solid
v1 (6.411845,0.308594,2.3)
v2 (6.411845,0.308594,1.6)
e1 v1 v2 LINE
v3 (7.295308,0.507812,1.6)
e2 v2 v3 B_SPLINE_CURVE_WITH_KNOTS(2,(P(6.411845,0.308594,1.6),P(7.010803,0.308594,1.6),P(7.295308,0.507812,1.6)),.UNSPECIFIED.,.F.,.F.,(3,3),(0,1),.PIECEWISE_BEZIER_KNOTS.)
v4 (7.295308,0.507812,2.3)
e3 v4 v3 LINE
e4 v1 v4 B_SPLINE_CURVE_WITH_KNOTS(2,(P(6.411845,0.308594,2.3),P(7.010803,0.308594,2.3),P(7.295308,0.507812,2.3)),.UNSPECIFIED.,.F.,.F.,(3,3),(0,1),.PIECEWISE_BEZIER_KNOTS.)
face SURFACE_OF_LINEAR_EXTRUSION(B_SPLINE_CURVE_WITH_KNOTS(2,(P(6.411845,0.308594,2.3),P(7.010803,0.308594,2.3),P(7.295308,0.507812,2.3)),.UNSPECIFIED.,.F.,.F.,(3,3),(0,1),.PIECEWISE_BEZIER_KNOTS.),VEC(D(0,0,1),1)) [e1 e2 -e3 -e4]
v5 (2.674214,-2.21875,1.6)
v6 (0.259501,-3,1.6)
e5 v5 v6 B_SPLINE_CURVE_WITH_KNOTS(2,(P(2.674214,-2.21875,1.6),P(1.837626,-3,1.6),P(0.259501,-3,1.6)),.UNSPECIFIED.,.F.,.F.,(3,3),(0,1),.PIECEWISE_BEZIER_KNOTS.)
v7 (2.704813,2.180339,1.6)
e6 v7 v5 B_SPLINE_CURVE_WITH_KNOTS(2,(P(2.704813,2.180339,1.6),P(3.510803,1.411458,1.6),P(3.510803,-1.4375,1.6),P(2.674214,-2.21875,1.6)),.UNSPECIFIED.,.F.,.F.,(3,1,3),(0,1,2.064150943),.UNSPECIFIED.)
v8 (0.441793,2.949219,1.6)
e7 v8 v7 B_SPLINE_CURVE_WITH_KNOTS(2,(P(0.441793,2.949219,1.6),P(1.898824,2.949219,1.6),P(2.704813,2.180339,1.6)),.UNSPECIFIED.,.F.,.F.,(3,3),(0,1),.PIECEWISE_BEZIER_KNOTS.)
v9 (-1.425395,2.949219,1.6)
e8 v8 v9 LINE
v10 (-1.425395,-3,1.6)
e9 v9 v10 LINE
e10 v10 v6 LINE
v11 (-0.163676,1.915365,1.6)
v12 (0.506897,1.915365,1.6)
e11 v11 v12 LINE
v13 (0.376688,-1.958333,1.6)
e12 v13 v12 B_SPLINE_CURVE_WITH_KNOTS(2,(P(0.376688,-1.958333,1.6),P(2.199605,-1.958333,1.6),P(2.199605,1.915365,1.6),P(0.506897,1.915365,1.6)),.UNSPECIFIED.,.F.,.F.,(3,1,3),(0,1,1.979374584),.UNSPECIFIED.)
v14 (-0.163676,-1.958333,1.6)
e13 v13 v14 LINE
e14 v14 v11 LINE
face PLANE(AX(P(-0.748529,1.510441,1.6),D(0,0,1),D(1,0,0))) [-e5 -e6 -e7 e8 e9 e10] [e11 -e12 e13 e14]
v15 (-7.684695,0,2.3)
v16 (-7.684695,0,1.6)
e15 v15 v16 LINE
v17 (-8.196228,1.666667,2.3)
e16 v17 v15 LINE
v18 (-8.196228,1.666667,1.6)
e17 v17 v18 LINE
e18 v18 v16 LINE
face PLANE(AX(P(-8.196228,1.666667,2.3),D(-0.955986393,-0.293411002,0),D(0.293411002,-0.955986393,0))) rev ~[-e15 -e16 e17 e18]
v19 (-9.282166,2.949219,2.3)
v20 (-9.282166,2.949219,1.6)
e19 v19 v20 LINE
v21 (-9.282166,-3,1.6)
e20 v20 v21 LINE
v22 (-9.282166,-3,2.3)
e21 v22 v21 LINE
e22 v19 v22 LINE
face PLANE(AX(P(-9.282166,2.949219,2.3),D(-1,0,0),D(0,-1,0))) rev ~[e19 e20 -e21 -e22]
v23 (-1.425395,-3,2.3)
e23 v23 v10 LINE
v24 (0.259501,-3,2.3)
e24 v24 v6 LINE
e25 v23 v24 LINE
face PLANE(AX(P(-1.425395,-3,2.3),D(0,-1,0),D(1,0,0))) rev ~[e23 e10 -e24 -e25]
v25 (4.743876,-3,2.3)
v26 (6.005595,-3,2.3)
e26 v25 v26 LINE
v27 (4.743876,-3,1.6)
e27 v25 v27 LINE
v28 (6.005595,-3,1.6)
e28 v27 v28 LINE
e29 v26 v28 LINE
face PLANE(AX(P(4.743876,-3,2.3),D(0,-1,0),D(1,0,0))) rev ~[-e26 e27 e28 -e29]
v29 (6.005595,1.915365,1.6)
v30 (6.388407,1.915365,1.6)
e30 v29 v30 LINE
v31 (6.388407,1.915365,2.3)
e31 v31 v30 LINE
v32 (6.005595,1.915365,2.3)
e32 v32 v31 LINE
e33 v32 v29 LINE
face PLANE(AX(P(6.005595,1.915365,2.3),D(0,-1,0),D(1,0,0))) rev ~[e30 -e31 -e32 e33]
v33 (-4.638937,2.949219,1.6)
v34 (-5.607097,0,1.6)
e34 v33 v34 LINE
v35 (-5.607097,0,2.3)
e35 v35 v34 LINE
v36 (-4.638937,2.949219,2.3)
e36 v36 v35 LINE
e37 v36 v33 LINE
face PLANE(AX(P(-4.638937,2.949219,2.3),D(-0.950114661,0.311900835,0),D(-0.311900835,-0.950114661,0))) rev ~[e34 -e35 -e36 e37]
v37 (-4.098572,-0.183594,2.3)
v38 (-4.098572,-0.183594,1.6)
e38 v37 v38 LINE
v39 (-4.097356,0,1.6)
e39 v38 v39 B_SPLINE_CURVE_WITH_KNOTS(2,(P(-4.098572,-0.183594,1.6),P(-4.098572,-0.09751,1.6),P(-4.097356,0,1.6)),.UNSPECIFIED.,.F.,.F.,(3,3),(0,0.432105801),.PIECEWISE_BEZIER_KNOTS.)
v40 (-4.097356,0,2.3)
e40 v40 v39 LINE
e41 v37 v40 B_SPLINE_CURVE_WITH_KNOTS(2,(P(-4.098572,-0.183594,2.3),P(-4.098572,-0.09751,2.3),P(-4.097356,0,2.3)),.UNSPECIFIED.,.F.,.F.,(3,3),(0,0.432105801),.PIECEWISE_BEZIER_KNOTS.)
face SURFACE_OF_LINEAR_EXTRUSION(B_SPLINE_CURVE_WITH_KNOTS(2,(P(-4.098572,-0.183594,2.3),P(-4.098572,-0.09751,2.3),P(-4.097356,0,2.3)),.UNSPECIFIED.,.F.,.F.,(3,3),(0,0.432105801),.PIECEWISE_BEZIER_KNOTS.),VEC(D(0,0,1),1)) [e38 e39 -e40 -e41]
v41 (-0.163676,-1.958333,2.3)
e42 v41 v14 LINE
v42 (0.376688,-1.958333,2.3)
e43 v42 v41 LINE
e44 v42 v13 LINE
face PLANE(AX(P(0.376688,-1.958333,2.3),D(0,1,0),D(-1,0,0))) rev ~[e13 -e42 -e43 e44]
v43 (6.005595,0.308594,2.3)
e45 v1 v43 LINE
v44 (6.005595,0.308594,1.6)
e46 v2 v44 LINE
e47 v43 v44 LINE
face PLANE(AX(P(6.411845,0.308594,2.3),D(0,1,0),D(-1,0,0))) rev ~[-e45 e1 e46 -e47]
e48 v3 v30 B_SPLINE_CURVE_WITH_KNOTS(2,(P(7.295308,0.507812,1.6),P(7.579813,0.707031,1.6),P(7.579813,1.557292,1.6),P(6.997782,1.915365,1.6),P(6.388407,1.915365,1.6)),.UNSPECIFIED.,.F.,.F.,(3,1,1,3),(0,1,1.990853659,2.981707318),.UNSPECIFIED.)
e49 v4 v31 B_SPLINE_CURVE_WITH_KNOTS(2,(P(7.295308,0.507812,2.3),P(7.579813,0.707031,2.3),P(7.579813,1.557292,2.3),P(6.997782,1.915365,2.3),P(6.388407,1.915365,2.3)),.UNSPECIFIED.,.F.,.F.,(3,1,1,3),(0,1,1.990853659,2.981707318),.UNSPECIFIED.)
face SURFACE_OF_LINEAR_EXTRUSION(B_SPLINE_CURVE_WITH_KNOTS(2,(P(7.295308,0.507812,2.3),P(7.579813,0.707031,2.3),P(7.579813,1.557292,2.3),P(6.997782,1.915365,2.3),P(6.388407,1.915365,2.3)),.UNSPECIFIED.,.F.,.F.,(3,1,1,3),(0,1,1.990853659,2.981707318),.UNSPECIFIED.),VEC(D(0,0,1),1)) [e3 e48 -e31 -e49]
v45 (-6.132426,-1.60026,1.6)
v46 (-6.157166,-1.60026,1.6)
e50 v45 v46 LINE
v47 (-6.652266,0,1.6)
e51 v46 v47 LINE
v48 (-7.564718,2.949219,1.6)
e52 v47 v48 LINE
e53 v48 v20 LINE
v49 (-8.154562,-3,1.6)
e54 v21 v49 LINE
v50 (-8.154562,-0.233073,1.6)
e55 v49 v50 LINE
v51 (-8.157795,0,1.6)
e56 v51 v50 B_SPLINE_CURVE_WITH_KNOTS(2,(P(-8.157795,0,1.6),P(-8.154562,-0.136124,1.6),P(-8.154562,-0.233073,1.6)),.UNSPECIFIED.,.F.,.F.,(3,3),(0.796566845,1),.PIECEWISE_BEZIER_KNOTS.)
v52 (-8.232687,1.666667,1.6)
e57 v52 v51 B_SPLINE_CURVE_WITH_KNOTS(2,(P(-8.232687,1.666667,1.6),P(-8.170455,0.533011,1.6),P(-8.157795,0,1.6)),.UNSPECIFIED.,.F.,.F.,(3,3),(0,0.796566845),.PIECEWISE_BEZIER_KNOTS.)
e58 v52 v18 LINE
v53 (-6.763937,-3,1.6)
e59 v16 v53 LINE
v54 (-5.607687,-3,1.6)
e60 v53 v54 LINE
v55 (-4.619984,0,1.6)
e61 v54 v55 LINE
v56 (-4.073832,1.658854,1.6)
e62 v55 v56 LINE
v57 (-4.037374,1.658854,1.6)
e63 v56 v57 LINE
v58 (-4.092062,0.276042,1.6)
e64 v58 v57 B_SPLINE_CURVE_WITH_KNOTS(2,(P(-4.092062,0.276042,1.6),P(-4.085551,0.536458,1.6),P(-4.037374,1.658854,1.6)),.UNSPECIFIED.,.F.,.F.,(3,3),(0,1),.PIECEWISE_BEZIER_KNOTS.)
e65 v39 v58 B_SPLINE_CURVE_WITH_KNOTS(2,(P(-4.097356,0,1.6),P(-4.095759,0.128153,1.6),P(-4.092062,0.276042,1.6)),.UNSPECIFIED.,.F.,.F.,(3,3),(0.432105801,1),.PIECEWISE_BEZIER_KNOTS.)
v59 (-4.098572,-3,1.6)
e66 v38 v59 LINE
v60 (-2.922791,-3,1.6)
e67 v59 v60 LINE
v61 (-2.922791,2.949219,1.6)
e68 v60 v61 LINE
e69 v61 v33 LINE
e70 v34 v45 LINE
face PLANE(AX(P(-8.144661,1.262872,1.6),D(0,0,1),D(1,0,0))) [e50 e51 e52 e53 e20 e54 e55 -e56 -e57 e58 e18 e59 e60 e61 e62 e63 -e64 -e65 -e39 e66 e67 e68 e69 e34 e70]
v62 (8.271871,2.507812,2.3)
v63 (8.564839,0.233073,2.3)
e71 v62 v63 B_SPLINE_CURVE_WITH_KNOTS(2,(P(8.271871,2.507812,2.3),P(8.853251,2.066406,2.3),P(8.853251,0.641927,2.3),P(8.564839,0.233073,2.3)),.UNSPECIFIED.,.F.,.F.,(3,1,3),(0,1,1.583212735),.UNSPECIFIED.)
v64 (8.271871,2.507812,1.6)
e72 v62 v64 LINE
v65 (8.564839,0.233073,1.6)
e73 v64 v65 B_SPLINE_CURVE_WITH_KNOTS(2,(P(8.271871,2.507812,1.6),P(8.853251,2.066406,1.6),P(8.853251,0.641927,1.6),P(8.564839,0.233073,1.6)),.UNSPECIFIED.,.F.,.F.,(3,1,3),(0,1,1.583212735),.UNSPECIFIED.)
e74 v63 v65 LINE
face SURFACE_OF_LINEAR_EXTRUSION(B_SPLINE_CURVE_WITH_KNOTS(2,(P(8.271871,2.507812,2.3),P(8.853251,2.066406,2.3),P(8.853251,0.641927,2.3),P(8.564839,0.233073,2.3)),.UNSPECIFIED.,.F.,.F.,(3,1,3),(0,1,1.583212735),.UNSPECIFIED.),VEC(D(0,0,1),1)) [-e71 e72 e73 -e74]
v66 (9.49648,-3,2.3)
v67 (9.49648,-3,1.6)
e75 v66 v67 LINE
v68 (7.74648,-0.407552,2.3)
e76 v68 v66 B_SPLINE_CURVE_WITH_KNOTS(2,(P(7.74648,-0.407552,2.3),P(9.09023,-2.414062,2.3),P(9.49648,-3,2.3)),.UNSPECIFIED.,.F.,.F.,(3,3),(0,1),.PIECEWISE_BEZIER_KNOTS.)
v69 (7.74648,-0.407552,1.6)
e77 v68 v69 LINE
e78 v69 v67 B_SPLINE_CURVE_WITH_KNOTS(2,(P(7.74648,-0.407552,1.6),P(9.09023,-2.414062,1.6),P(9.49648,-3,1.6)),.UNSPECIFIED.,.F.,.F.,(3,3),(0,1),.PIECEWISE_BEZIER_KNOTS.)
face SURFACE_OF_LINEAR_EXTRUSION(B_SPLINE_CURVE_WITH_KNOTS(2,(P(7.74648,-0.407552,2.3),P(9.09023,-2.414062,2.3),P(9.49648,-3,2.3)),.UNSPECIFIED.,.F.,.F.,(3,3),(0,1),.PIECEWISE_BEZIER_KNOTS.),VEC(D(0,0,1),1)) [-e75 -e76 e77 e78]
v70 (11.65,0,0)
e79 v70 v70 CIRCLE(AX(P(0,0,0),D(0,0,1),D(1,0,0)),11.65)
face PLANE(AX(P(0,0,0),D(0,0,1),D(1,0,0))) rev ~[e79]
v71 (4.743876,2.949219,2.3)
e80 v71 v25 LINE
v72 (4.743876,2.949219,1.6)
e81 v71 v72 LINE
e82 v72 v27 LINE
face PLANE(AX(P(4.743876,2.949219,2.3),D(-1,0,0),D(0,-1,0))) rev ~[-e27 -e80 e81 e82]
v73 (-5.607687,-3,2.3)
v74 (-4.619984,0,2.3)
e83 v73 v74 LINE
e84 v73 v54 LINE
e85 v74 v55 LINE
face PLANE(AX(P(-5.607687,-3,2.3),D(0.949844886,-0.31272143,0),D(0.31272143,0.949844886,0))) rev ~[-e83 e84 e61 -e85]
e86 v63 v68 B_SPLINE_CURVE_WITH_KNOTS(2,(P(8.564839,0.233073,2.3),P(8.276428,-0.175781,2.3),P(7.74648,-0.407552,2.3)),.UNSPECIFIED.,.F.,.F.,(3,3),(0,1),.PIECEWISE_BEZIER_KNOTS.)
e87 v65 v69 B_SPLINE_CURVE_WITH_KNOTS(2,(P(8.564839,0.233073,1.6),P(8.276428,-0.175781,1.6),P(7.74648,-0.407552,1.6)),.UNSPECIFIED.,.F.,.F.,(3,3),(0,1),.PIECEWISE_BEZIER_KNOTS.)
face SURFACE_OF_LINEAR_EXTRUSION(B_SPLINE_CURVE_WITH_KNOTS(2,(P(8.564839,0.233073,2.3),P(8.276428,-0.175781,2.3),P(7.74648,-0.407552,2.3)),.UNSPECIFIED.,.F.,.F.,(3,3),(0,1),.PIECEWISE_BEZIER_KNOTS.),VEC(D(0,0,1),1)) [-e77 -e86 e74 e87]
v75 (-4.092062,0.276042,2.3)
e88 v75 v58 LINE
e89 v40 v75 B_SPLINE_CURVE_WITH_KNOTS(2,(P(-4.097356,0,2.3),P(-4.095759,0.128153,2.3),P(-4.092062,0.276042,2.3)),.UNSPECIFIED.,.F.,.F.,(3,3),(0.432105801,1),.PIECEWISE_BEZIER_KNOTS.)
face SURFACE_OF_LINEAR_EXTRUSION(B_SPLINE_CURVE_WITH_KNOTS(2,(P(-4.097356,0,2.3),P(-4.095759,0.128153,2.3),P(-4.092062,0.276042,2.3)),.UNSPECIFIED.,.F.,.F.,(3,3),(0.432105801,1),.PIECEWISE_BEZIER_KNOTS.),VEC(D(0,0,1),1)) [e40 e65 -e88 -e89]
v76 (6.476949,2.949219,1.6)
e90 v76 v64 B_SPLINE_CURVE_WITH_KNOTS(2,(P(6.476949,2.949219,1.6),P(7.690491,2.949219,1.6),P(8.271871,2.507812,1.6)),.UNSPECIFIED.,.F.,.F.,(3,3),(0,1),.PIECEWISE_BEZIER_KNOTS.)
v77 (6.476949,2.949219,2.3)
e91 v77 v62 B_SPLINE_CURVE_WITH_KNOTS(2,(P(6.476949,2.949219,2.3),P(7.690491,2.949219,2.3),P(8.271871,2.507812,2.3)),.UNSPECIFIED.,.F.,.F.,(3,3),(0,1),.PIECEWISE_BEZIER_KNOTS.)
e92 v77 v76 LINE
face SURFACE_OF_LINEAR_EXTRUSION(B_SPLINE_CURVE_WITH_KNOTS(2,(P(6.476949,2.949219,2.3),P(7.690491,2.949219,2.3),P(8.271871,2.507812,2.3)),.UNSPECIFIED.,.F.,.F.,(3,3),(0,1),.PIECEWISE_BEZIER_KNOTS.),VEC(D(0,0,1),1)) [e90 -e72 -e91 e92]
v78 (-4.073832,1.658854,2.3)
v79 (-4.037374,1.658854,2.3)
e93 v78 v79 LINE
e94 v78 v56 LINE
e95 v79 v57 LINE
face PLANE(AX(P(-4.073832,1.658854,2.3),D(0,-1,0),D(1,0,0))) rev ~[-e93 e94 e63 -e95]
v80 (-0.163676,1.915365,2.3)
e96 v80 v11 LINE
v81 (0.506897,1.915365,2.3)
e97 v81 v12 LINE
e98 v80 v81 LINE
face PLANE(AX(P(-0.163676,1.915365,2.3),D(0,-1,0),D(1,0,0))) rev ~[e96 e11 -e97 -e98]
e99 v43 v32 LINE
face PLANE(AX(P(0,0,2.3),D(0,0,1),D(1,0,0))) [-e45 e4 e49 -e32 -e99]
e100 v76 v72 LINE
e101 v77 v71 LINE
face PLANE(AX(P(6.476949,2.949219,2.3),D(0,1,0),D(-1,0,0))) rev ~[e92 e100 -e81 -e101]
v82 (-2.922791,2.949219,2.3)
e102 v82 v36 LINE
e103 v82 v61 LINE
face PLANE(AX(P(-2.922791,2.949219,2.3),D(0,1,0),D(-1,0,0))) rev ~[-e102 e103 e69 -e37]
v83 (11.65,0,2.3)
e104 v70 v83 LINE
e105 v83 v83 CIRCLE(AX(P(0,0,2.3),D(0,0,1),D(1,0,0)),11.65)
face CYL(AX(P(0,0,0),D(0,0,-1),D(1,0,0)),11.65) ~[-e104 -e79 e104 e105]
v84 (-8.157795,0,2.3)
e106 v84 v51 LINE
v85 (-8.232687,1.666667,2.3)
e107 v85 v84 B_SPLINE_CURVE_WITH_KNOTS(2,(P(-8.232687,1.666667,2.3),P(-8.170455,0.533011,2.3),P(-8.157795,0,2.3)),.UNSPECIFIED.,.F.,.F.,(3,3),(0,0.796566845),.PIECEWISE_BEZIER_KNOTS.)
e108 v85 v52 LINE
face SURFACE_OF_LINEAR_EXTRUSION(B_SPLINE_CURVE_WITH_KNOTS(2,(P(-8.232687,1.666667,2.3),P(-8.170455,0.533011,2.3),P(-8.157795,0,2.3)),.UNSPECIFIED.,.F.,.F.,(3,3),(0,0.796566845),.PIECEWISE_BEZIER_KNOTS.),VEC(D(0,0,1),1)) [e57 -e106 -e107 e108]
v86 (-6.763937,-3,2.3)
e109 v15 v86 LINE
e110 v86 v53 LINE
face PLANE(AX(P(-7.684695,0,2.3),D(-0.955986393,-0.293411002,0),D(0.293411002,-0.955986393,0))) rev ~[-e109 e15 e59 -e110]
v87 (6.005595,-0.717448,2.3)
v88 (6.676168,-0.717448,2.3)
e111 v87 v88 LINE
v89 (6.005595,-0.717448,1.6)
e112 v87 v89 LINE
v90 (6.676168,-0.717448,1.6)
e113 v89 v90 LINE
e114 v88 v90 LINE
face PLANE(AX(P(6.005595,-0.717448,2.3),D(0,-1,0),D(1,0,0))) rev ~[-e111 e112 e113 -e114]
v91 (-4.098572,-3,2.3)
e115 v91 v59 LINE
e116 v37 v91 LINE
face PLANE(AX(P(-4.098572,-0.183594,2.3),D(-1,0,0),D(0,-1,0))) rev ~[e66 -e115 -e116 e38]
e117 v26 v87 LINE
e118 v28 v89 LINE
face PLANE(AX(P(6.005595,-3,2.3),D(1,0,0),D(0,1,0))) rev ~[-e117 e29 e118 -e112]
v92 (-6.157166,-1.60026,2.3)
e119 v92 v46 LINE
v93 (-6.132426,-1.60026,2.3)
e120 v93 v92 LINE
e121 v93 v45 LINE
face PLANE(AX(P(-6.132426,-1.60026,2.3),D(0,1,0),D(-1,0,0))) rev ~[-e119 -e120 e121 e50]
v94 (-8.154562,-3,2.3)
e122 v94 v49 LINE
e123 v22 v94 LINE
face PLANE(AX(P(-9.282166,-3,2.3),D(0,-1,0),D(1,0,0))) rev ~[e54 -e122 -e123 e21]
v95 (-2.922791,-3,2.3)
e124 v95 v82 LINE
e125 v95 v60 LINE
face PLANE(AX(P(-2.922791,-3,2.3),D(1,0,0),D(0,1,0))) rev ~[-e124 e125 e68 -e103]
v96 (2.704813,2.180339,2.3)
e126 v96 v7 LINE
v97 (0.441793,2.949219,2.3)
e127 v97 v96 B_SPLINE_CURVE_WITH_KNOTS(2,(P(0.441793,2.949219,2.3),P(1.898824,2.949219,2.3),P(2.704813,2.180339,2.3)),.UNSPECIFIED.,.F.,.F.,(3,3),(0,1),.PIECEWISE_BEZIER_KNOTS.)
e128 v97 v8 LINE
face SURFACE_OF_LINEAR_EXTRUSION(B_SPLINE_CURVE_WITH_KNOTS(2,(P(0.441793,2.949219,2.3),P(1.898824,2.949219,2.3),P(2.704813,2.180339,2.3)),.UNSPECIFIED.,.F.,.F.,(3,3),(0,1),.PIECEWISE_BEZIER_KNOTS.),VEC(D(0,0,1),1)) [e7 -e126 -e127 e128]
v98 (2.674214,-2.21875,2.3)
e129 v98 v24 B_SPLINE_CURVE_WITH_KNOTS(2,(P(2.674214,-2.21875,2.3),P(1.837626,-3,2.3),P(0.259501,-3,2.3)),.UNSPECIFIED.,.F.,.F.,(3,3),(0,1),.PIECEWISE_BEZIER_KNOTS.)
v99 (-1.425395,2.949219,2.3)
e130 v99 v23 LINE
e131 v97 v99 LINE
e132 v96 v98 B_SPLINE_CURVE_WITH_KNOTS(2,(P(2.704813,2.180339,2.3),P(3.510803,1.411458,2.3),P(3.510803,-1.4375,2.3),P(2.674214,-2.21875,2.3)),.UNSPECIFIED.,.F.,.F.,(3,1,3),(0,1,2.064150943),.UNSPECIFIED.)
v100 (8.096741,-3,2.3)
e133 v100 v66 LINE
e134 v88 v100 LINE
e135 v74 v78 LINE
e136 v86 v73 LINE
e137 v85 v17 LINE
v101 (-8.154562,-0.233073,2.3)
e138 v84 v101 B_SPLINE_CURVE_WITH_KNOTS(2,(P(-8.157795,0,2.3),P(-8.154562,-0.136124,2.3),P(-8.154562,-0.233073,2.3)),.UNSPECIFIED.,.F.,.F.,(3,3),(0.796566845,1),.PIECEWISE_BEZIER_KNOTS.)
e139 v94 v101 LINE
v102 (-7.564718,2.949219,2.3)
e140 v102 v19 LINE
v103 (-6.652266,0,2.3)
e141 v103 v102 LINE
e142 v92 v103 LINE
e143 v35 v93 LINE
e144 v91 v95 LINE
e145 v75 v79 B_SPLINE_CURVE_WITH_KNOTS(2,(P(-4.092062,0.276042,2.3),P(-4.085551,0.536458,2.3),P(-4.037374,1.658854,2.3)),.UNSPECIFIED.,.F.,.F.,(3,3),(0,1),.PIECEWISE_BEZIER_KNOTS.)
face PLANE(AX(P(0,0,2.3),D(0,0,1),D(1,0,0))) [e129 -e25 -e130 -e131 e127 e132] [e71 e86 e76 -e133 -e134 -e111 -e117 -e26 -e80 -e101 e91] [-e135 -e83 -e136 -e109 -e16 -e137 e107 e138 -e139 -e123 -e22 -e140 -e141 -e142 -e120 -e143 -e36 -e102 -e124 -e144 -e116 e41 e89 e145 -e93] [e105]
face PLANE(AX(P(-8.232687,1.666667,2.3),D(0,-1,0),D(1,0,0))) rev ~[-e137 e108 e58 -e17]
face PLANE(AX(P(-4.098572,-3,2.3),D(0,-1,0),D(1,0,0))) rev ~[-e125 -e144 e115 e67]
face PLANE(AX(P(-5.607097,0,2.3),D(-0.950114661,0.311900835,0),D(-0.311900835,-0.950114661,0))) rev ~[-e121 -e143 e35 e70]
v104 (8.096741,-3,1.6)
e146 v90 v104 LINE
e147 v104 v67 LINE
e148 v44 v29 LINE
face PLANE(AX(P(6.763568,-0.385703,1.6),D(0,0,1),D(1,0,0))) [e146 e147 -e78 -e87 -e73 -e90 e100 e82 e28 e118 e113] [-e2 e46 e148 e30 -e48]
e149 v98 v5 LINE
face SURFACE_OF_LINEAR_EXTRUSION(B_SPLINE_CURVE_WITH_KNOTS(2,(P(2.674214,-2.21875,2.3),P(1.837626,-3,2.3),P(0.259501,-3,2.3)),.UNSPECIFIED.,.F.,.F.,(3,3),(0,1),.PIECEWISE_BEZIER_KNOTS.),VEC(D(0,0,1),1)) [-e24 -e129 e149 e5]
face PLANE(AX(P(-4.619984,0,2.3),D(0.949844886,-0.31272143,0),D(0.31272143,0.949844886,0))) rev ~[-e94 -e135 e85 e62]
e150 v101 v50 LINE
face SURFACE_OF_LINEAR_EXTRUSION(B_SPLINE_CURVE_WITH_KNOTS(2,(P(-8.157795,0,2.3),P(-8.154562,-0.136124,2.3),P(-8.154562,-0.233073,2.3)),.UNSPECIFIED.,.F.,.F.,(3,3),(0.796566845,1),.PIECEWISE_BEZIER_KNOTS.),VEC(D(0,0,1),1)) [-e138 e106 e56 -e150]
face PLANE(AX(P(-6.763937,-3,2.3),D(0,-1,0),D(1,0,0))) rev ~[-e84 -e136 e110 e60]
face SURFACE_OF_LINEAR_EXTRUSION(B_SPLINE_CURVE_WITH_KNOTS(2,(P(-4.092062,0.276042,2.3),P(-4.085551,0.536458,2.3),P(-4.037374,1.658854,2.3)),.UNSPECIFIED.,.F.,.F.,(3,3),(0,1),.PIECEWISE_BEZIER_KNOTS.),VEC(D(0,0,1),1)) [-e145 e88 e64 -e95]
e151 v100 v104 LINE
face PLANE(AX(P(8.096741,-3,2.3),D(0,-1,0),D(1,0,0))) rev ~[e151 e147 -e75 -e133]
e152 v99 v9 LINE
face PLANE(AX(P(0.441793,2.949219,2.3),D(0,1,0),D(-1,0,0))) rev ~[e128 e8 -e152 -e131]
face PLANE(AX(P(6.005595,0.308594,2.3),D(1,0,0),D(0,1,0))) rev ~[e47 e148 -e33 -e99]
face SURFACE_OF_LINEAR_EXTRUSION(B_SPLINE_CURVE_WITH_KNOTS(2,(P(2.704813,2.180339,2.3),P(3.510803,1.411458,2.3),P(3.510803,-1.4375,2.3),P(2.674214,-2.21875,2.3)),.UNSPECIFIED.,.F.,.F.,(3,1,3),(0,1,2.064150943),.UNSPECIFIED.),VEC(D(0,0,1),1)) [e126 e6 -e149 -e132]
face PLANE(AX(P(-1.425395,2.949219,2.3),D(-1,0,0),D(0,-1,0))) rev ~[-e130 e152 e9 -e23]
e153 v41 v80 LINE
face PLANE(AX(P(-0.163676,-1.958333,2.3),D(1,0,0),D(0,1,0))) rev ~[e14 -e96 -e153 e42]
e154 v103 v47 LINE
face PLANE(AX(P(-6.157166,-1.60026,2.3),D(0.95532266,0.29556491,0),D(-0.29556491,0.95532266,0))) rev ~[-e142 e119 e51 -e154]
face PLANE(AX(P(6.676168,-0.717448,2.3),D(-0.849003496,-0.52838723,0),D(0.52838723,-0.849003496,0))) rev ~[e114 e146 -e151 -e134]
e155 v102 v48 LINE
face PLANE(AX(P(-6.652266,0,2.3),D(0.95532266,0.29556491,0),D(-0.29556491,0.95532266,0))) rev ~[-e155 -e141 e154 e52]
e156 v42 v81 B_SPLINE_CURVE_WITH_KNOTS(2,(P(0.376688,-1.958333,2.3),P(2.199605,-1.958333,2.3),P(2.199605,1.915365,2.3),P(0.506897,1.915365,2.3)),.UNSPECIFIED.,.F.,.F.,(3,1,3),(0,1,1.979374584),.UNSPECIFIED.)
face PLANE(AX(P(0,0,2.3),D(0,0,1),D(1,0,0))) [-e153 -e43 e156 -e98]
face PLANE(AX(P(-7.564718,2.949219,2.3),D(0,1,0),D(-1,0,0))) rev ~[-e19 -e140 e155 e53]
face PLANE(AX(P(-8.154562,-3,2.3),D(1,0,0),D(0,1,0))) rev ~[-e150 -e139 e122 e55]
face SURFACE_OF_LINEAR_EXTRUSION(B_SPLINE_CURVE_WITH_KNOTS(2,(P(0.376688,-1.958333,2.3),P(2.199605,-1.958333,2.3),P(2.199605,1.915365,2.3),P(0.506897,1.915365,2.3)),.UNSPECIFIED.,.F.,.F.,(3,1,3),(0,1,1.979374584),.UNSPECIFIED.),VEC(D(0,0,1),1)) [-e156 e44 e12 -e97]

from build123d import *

# Parameters (mm, degrees)
F0_R     = 11.65
F1_DEPTH = 2.3
F3_DEPTH = 0.7


with BuildPart() as f1:
    # F0 (on Top) → F1 (new body)
    with BuildSketch(Plane.XY):
        Circle(F0_R)
    extrude(amount=F1_DEPTH)

    # F2 (on face) → F3 (cut)
    with BuildSketch(Plane.XY.offset(2.3)):
        with BuildLine():
            Line((-9.2821657193, 2.94921875), (-9.2821657193, 0))
            Line((-9.2821657193, 0), (-8.1577947596, 0))
            add(Edge.make_bspline(
                [(-8.2326865526, 1.6666666667), (-8.1704547679, 0.5330109879), (-8.1577947596, 0)],
                knots=[0, 0, 0, 0.7965668448, 0.7965668448, 0.7965668448], degree=2))
            Line((-8.2326865526, 1.6666666667), (-8.1962282193, 1.6666666667))
            Line((-8.1962282193, 1.6666666667), (-7.6846954812, 0))
            Line((-7.6846954812, 0), (-6.6522663233, 0))
            Line((-6.6522663233, 0), (-7.5647178026, 2.94921875))
            Line((-7.5647178026, 2.94921875), (-9.2821657193, 2.94921875))
        make_face()
        with BuildLine():
            Line((-8.1577947596, 0), (-9.2821657193, 0))
            Line((-9.2821657193, 0), (-9.2821657193, -3))
            Line((-9.2821657193, -3), (-8.1545615526, -3))
            Line((-8.1545615526, -3), (-8.1545615526, -0.2330729167))
            add(Edge.make_bspline(
                [(-8.1577947596, 0), (-8.1545615526, -0.1361243036), (-8.1545615526, -0.2330729167)],
                knots=[0.7965668448, 0.7965668448, 0.7965668448, 1, 1, 1], degree=2))
        make_face()
        Polygon((-5.6076865526, -3), (-4.6199839255, 0), (-5.607097373, 0), (-6.132426136, -1.6002604167), (-6.1571657193, -1.6002604167), (-6.6522663233, 0), (-7.6846954812, 0), (-6.7639365526, -3), align=None)
        with BuildLine():
            Line((-4.0973563741, 0), (-2.9227907193, 0))
            Line((-2.9227907193, 0), (-2.9227907193, 2.94921875))
            Line((-2.9227907193, 2.94921875), (-4.6389365526, 2.94921875))
            Line((-4.6389365526, 2.94921875), (-5.607097373, 0))
            Line((-5.607097373, 0), (-4.6199839255, 0))
            Line((-4.6199839255, 0), (-4.073832386, 1.6588541667))
            Line((-4.073832386, 1.6588541667), (-4.0373740526, 1.6588541667))
            add(Edge.make_bspline(
                [(-4.0920615526, 0.2760416667), (-4.085551136, 0.5364583333), (-4.0373740526, 1.6588541667)],
                knots=[0, 0, 0, 1, 1, 1], degree=2))
            add(Edge.make_bspline(
                [(-4.0973563741, 0), (-4.0957587805, 0.1281525523), (-4.0920615526, 0.2760416667)],
                knots=[0.432105801, 0.432105801, 0.432105801, 1, 1, 1], degree=2))
        make_face()
        with BuildLine():
            Line((-2.9227907193, -3), (-2.9227907193, 0))
            Line((-2.9227907193, 0), (-4.0973563741, 0))
            add(Edge.make_bspline(
                [(-4.0985719693, -0.18359375), (-4.0985719693, -0.0975101725), (-4.0973563741, 0)],
                knots=[0, 0, 0, 0.432105801, 0.432105801, 0.432105801], degree=2))
            Line((-4.0985719693, -0.18359375), (-4.0985719693, -3))
            Line((-4.0985719693, -3), (-2.9227907193, -3))
        make_face()
        Polygon((-1.425394886, 0), (-0.163676136, 0), (-0.163676136, 1.9153645833), (0, 1.9153645833), (0, 2.94921875), (-1.425394886, 2.94921875), align=None)
        with BuildLine():
            Line((-0.163676136, -1.9583333333), (-0.163676136, 0))
            Line((-0.163676136, 0), (-1.425394886, 0))
            Line((-1.425394886, 0), (-1.425394886, -3))
            Line((-1.425394886, -3), (0.2595009474, -3))
            add(Edge.make_bspline(
                [(2.674214489, -2.21875), (1.8376259474, -3), (0.2595009474, -3)],
                knots=[0, 0, 0, 1, 1, 1], degree=2))
            add(Edge.make_bspline(
                [(3.5108030307, 0.03125), (3.5108030307, -1.4375), (2.674214489, -2.21875)],
                knots=[0, 0, 0, 1, 1, 1], degree=2))
            add(Edge.make_bspline(
                [(2.7048134474, 2.1803385417), (3.5108030307, 1.4114583333), (3.5108030307, 0.03125)],
                knots=[0, 0, 0, 1, 1, 1], degree=2))
            add(Edge.make_bspline(
                [(0.441792614, 2.94921875), (1.898823864, 2.94921875), (2.7048134474, 2.1803385417)],
                knots=[0, 0, 0, 1, 1, 1], degree=2))
            Line((0.441792614, 2.94921875), (0, 2.94921875))
            Line((0, 2.94921875), (0, 1.9153645833))
            Line((0, 1.9153645833), (0.5068967807, 1.9153645833))
            add(Edge.make_bspline(
                [(2.199605114, -0.0013020833), (2.199605114, 1.9153645833), (0.5068967807, 1.9153645833)],
                knots=[0, 0, 0, 1, 1, 1], degree=2))
            add(Edge.make_bspline(
                [(0.3766884474, -1.9583333333), (2.199605114, -1.9583333333), (2.199605114, -0.0013020833)],
                knots=[0, 0, 0, 1, 1, 1], degree=2))
            Line((0.3766884474, -1.9583333333), (-0.163676136, -1.9583333333))
        make_face()
        with BuildLine():
            Line((6.0055946974, -3), (6.0055946974, -0.7174479167))
            Line((6.0055946974, -0.7174479167), (6.676167614, -0.7174479167))
            Line((6.676167614, -0.7174479167), (8.0967405307, -3))
            Line((8.0967405307, -3), (9.496480114, -3))
            add(Edge.make_bspline(
                [(7.746480114, -0.4075520833), (9.090230114, -2.4140625), (9.496480114, -3)],
                knots=[0, 0, 0, 1, 1, 1], degree=2))
            add(Edge.make_bspline(
                [(8.564839489, 0.2330729167), (8.2764280307, -0.17578125), (7.746480114, -0.4075520833)],
                knots=[0, 0, 0, 1, 1, 1], degree=2))
            add(Edge.make_bspline(
                [(8.8532509474, 1.1666666667), (8.8532509474, 0.6419270833), (8.564839489, 0.2330729167)],
                knots=[0, 0, 0, 1, 1, 1], degree=2))
            add(Edge.make_bspline(
                [(8.271870739, 2.5078125), (8.8532509474, 2.06640625), (8.8532509474, 1.1666666667)],
                knots=[0, 0, 0, 1, 1, 1], degree=2))
            add(Edge.make_bspline(
                [(6.476948864, 2.94921875), (7.6904905307, 2.94921875), (8.271870739, 2.5078125)],
                knots=[0, 0, 0, 1, 1, 1], degree=2))
            Line((6.476948864, 2.94921875), (4.7438759474, 2.94921875))
            Line((4.7438759474, 2.94921875), (4.7438759474, -3))
            Line((4.7438759474, -3), (6.0055946974, -3))
        make_face()
        with BuildLine():
            Line((6.4118446974, 0.30859375), (6.0055946974, 0.30859375))
            Line((6.0055946974, 0.30859375), (6.0055946974, 1.9153645833))
            Line((6.0055946974, 1.9153645833), (6.3884071974, 1.9153645833))
            add(Edge.make_bspline(
                [(7.2887978224, 1.736328125), (6.9977821974, 1.9153645833), (6.3884071974, 1.9153645833)],
                knots=[0, 0, 0, 1, 1, 1], degree=2))
            add(Edge.make_bspline(
                [(7.5798134474, 1.1341145833), (7.5798134474, 1.5572916667), (7.2887978224, 1.736328125)],
                knots=[0, 0, 0, 1, 1, 1], degree=2))
            add(Edge.make_bspline(
                [(7.295308239, 0.5078125), (7.5798134474, 0.70703125), (7.5798134474, 1.1341145833)],
                knots=[0, 0, 0, 1, 1, 1], degree=2))
            add(Edge.make_bspline(
                [(6.4118446974, 0.30859375), (7.0108030307, 0.30859375), (7.295308239, 0.5078125)],
                knots=[0, 0, 0, 1, 1, 1], degree=2))
        make_face(mode=Mode.SUBTRACT)
    extrude(amount=-F3_DEPTH, mode=Mode.SUBTRACT)


solid = f1.part
